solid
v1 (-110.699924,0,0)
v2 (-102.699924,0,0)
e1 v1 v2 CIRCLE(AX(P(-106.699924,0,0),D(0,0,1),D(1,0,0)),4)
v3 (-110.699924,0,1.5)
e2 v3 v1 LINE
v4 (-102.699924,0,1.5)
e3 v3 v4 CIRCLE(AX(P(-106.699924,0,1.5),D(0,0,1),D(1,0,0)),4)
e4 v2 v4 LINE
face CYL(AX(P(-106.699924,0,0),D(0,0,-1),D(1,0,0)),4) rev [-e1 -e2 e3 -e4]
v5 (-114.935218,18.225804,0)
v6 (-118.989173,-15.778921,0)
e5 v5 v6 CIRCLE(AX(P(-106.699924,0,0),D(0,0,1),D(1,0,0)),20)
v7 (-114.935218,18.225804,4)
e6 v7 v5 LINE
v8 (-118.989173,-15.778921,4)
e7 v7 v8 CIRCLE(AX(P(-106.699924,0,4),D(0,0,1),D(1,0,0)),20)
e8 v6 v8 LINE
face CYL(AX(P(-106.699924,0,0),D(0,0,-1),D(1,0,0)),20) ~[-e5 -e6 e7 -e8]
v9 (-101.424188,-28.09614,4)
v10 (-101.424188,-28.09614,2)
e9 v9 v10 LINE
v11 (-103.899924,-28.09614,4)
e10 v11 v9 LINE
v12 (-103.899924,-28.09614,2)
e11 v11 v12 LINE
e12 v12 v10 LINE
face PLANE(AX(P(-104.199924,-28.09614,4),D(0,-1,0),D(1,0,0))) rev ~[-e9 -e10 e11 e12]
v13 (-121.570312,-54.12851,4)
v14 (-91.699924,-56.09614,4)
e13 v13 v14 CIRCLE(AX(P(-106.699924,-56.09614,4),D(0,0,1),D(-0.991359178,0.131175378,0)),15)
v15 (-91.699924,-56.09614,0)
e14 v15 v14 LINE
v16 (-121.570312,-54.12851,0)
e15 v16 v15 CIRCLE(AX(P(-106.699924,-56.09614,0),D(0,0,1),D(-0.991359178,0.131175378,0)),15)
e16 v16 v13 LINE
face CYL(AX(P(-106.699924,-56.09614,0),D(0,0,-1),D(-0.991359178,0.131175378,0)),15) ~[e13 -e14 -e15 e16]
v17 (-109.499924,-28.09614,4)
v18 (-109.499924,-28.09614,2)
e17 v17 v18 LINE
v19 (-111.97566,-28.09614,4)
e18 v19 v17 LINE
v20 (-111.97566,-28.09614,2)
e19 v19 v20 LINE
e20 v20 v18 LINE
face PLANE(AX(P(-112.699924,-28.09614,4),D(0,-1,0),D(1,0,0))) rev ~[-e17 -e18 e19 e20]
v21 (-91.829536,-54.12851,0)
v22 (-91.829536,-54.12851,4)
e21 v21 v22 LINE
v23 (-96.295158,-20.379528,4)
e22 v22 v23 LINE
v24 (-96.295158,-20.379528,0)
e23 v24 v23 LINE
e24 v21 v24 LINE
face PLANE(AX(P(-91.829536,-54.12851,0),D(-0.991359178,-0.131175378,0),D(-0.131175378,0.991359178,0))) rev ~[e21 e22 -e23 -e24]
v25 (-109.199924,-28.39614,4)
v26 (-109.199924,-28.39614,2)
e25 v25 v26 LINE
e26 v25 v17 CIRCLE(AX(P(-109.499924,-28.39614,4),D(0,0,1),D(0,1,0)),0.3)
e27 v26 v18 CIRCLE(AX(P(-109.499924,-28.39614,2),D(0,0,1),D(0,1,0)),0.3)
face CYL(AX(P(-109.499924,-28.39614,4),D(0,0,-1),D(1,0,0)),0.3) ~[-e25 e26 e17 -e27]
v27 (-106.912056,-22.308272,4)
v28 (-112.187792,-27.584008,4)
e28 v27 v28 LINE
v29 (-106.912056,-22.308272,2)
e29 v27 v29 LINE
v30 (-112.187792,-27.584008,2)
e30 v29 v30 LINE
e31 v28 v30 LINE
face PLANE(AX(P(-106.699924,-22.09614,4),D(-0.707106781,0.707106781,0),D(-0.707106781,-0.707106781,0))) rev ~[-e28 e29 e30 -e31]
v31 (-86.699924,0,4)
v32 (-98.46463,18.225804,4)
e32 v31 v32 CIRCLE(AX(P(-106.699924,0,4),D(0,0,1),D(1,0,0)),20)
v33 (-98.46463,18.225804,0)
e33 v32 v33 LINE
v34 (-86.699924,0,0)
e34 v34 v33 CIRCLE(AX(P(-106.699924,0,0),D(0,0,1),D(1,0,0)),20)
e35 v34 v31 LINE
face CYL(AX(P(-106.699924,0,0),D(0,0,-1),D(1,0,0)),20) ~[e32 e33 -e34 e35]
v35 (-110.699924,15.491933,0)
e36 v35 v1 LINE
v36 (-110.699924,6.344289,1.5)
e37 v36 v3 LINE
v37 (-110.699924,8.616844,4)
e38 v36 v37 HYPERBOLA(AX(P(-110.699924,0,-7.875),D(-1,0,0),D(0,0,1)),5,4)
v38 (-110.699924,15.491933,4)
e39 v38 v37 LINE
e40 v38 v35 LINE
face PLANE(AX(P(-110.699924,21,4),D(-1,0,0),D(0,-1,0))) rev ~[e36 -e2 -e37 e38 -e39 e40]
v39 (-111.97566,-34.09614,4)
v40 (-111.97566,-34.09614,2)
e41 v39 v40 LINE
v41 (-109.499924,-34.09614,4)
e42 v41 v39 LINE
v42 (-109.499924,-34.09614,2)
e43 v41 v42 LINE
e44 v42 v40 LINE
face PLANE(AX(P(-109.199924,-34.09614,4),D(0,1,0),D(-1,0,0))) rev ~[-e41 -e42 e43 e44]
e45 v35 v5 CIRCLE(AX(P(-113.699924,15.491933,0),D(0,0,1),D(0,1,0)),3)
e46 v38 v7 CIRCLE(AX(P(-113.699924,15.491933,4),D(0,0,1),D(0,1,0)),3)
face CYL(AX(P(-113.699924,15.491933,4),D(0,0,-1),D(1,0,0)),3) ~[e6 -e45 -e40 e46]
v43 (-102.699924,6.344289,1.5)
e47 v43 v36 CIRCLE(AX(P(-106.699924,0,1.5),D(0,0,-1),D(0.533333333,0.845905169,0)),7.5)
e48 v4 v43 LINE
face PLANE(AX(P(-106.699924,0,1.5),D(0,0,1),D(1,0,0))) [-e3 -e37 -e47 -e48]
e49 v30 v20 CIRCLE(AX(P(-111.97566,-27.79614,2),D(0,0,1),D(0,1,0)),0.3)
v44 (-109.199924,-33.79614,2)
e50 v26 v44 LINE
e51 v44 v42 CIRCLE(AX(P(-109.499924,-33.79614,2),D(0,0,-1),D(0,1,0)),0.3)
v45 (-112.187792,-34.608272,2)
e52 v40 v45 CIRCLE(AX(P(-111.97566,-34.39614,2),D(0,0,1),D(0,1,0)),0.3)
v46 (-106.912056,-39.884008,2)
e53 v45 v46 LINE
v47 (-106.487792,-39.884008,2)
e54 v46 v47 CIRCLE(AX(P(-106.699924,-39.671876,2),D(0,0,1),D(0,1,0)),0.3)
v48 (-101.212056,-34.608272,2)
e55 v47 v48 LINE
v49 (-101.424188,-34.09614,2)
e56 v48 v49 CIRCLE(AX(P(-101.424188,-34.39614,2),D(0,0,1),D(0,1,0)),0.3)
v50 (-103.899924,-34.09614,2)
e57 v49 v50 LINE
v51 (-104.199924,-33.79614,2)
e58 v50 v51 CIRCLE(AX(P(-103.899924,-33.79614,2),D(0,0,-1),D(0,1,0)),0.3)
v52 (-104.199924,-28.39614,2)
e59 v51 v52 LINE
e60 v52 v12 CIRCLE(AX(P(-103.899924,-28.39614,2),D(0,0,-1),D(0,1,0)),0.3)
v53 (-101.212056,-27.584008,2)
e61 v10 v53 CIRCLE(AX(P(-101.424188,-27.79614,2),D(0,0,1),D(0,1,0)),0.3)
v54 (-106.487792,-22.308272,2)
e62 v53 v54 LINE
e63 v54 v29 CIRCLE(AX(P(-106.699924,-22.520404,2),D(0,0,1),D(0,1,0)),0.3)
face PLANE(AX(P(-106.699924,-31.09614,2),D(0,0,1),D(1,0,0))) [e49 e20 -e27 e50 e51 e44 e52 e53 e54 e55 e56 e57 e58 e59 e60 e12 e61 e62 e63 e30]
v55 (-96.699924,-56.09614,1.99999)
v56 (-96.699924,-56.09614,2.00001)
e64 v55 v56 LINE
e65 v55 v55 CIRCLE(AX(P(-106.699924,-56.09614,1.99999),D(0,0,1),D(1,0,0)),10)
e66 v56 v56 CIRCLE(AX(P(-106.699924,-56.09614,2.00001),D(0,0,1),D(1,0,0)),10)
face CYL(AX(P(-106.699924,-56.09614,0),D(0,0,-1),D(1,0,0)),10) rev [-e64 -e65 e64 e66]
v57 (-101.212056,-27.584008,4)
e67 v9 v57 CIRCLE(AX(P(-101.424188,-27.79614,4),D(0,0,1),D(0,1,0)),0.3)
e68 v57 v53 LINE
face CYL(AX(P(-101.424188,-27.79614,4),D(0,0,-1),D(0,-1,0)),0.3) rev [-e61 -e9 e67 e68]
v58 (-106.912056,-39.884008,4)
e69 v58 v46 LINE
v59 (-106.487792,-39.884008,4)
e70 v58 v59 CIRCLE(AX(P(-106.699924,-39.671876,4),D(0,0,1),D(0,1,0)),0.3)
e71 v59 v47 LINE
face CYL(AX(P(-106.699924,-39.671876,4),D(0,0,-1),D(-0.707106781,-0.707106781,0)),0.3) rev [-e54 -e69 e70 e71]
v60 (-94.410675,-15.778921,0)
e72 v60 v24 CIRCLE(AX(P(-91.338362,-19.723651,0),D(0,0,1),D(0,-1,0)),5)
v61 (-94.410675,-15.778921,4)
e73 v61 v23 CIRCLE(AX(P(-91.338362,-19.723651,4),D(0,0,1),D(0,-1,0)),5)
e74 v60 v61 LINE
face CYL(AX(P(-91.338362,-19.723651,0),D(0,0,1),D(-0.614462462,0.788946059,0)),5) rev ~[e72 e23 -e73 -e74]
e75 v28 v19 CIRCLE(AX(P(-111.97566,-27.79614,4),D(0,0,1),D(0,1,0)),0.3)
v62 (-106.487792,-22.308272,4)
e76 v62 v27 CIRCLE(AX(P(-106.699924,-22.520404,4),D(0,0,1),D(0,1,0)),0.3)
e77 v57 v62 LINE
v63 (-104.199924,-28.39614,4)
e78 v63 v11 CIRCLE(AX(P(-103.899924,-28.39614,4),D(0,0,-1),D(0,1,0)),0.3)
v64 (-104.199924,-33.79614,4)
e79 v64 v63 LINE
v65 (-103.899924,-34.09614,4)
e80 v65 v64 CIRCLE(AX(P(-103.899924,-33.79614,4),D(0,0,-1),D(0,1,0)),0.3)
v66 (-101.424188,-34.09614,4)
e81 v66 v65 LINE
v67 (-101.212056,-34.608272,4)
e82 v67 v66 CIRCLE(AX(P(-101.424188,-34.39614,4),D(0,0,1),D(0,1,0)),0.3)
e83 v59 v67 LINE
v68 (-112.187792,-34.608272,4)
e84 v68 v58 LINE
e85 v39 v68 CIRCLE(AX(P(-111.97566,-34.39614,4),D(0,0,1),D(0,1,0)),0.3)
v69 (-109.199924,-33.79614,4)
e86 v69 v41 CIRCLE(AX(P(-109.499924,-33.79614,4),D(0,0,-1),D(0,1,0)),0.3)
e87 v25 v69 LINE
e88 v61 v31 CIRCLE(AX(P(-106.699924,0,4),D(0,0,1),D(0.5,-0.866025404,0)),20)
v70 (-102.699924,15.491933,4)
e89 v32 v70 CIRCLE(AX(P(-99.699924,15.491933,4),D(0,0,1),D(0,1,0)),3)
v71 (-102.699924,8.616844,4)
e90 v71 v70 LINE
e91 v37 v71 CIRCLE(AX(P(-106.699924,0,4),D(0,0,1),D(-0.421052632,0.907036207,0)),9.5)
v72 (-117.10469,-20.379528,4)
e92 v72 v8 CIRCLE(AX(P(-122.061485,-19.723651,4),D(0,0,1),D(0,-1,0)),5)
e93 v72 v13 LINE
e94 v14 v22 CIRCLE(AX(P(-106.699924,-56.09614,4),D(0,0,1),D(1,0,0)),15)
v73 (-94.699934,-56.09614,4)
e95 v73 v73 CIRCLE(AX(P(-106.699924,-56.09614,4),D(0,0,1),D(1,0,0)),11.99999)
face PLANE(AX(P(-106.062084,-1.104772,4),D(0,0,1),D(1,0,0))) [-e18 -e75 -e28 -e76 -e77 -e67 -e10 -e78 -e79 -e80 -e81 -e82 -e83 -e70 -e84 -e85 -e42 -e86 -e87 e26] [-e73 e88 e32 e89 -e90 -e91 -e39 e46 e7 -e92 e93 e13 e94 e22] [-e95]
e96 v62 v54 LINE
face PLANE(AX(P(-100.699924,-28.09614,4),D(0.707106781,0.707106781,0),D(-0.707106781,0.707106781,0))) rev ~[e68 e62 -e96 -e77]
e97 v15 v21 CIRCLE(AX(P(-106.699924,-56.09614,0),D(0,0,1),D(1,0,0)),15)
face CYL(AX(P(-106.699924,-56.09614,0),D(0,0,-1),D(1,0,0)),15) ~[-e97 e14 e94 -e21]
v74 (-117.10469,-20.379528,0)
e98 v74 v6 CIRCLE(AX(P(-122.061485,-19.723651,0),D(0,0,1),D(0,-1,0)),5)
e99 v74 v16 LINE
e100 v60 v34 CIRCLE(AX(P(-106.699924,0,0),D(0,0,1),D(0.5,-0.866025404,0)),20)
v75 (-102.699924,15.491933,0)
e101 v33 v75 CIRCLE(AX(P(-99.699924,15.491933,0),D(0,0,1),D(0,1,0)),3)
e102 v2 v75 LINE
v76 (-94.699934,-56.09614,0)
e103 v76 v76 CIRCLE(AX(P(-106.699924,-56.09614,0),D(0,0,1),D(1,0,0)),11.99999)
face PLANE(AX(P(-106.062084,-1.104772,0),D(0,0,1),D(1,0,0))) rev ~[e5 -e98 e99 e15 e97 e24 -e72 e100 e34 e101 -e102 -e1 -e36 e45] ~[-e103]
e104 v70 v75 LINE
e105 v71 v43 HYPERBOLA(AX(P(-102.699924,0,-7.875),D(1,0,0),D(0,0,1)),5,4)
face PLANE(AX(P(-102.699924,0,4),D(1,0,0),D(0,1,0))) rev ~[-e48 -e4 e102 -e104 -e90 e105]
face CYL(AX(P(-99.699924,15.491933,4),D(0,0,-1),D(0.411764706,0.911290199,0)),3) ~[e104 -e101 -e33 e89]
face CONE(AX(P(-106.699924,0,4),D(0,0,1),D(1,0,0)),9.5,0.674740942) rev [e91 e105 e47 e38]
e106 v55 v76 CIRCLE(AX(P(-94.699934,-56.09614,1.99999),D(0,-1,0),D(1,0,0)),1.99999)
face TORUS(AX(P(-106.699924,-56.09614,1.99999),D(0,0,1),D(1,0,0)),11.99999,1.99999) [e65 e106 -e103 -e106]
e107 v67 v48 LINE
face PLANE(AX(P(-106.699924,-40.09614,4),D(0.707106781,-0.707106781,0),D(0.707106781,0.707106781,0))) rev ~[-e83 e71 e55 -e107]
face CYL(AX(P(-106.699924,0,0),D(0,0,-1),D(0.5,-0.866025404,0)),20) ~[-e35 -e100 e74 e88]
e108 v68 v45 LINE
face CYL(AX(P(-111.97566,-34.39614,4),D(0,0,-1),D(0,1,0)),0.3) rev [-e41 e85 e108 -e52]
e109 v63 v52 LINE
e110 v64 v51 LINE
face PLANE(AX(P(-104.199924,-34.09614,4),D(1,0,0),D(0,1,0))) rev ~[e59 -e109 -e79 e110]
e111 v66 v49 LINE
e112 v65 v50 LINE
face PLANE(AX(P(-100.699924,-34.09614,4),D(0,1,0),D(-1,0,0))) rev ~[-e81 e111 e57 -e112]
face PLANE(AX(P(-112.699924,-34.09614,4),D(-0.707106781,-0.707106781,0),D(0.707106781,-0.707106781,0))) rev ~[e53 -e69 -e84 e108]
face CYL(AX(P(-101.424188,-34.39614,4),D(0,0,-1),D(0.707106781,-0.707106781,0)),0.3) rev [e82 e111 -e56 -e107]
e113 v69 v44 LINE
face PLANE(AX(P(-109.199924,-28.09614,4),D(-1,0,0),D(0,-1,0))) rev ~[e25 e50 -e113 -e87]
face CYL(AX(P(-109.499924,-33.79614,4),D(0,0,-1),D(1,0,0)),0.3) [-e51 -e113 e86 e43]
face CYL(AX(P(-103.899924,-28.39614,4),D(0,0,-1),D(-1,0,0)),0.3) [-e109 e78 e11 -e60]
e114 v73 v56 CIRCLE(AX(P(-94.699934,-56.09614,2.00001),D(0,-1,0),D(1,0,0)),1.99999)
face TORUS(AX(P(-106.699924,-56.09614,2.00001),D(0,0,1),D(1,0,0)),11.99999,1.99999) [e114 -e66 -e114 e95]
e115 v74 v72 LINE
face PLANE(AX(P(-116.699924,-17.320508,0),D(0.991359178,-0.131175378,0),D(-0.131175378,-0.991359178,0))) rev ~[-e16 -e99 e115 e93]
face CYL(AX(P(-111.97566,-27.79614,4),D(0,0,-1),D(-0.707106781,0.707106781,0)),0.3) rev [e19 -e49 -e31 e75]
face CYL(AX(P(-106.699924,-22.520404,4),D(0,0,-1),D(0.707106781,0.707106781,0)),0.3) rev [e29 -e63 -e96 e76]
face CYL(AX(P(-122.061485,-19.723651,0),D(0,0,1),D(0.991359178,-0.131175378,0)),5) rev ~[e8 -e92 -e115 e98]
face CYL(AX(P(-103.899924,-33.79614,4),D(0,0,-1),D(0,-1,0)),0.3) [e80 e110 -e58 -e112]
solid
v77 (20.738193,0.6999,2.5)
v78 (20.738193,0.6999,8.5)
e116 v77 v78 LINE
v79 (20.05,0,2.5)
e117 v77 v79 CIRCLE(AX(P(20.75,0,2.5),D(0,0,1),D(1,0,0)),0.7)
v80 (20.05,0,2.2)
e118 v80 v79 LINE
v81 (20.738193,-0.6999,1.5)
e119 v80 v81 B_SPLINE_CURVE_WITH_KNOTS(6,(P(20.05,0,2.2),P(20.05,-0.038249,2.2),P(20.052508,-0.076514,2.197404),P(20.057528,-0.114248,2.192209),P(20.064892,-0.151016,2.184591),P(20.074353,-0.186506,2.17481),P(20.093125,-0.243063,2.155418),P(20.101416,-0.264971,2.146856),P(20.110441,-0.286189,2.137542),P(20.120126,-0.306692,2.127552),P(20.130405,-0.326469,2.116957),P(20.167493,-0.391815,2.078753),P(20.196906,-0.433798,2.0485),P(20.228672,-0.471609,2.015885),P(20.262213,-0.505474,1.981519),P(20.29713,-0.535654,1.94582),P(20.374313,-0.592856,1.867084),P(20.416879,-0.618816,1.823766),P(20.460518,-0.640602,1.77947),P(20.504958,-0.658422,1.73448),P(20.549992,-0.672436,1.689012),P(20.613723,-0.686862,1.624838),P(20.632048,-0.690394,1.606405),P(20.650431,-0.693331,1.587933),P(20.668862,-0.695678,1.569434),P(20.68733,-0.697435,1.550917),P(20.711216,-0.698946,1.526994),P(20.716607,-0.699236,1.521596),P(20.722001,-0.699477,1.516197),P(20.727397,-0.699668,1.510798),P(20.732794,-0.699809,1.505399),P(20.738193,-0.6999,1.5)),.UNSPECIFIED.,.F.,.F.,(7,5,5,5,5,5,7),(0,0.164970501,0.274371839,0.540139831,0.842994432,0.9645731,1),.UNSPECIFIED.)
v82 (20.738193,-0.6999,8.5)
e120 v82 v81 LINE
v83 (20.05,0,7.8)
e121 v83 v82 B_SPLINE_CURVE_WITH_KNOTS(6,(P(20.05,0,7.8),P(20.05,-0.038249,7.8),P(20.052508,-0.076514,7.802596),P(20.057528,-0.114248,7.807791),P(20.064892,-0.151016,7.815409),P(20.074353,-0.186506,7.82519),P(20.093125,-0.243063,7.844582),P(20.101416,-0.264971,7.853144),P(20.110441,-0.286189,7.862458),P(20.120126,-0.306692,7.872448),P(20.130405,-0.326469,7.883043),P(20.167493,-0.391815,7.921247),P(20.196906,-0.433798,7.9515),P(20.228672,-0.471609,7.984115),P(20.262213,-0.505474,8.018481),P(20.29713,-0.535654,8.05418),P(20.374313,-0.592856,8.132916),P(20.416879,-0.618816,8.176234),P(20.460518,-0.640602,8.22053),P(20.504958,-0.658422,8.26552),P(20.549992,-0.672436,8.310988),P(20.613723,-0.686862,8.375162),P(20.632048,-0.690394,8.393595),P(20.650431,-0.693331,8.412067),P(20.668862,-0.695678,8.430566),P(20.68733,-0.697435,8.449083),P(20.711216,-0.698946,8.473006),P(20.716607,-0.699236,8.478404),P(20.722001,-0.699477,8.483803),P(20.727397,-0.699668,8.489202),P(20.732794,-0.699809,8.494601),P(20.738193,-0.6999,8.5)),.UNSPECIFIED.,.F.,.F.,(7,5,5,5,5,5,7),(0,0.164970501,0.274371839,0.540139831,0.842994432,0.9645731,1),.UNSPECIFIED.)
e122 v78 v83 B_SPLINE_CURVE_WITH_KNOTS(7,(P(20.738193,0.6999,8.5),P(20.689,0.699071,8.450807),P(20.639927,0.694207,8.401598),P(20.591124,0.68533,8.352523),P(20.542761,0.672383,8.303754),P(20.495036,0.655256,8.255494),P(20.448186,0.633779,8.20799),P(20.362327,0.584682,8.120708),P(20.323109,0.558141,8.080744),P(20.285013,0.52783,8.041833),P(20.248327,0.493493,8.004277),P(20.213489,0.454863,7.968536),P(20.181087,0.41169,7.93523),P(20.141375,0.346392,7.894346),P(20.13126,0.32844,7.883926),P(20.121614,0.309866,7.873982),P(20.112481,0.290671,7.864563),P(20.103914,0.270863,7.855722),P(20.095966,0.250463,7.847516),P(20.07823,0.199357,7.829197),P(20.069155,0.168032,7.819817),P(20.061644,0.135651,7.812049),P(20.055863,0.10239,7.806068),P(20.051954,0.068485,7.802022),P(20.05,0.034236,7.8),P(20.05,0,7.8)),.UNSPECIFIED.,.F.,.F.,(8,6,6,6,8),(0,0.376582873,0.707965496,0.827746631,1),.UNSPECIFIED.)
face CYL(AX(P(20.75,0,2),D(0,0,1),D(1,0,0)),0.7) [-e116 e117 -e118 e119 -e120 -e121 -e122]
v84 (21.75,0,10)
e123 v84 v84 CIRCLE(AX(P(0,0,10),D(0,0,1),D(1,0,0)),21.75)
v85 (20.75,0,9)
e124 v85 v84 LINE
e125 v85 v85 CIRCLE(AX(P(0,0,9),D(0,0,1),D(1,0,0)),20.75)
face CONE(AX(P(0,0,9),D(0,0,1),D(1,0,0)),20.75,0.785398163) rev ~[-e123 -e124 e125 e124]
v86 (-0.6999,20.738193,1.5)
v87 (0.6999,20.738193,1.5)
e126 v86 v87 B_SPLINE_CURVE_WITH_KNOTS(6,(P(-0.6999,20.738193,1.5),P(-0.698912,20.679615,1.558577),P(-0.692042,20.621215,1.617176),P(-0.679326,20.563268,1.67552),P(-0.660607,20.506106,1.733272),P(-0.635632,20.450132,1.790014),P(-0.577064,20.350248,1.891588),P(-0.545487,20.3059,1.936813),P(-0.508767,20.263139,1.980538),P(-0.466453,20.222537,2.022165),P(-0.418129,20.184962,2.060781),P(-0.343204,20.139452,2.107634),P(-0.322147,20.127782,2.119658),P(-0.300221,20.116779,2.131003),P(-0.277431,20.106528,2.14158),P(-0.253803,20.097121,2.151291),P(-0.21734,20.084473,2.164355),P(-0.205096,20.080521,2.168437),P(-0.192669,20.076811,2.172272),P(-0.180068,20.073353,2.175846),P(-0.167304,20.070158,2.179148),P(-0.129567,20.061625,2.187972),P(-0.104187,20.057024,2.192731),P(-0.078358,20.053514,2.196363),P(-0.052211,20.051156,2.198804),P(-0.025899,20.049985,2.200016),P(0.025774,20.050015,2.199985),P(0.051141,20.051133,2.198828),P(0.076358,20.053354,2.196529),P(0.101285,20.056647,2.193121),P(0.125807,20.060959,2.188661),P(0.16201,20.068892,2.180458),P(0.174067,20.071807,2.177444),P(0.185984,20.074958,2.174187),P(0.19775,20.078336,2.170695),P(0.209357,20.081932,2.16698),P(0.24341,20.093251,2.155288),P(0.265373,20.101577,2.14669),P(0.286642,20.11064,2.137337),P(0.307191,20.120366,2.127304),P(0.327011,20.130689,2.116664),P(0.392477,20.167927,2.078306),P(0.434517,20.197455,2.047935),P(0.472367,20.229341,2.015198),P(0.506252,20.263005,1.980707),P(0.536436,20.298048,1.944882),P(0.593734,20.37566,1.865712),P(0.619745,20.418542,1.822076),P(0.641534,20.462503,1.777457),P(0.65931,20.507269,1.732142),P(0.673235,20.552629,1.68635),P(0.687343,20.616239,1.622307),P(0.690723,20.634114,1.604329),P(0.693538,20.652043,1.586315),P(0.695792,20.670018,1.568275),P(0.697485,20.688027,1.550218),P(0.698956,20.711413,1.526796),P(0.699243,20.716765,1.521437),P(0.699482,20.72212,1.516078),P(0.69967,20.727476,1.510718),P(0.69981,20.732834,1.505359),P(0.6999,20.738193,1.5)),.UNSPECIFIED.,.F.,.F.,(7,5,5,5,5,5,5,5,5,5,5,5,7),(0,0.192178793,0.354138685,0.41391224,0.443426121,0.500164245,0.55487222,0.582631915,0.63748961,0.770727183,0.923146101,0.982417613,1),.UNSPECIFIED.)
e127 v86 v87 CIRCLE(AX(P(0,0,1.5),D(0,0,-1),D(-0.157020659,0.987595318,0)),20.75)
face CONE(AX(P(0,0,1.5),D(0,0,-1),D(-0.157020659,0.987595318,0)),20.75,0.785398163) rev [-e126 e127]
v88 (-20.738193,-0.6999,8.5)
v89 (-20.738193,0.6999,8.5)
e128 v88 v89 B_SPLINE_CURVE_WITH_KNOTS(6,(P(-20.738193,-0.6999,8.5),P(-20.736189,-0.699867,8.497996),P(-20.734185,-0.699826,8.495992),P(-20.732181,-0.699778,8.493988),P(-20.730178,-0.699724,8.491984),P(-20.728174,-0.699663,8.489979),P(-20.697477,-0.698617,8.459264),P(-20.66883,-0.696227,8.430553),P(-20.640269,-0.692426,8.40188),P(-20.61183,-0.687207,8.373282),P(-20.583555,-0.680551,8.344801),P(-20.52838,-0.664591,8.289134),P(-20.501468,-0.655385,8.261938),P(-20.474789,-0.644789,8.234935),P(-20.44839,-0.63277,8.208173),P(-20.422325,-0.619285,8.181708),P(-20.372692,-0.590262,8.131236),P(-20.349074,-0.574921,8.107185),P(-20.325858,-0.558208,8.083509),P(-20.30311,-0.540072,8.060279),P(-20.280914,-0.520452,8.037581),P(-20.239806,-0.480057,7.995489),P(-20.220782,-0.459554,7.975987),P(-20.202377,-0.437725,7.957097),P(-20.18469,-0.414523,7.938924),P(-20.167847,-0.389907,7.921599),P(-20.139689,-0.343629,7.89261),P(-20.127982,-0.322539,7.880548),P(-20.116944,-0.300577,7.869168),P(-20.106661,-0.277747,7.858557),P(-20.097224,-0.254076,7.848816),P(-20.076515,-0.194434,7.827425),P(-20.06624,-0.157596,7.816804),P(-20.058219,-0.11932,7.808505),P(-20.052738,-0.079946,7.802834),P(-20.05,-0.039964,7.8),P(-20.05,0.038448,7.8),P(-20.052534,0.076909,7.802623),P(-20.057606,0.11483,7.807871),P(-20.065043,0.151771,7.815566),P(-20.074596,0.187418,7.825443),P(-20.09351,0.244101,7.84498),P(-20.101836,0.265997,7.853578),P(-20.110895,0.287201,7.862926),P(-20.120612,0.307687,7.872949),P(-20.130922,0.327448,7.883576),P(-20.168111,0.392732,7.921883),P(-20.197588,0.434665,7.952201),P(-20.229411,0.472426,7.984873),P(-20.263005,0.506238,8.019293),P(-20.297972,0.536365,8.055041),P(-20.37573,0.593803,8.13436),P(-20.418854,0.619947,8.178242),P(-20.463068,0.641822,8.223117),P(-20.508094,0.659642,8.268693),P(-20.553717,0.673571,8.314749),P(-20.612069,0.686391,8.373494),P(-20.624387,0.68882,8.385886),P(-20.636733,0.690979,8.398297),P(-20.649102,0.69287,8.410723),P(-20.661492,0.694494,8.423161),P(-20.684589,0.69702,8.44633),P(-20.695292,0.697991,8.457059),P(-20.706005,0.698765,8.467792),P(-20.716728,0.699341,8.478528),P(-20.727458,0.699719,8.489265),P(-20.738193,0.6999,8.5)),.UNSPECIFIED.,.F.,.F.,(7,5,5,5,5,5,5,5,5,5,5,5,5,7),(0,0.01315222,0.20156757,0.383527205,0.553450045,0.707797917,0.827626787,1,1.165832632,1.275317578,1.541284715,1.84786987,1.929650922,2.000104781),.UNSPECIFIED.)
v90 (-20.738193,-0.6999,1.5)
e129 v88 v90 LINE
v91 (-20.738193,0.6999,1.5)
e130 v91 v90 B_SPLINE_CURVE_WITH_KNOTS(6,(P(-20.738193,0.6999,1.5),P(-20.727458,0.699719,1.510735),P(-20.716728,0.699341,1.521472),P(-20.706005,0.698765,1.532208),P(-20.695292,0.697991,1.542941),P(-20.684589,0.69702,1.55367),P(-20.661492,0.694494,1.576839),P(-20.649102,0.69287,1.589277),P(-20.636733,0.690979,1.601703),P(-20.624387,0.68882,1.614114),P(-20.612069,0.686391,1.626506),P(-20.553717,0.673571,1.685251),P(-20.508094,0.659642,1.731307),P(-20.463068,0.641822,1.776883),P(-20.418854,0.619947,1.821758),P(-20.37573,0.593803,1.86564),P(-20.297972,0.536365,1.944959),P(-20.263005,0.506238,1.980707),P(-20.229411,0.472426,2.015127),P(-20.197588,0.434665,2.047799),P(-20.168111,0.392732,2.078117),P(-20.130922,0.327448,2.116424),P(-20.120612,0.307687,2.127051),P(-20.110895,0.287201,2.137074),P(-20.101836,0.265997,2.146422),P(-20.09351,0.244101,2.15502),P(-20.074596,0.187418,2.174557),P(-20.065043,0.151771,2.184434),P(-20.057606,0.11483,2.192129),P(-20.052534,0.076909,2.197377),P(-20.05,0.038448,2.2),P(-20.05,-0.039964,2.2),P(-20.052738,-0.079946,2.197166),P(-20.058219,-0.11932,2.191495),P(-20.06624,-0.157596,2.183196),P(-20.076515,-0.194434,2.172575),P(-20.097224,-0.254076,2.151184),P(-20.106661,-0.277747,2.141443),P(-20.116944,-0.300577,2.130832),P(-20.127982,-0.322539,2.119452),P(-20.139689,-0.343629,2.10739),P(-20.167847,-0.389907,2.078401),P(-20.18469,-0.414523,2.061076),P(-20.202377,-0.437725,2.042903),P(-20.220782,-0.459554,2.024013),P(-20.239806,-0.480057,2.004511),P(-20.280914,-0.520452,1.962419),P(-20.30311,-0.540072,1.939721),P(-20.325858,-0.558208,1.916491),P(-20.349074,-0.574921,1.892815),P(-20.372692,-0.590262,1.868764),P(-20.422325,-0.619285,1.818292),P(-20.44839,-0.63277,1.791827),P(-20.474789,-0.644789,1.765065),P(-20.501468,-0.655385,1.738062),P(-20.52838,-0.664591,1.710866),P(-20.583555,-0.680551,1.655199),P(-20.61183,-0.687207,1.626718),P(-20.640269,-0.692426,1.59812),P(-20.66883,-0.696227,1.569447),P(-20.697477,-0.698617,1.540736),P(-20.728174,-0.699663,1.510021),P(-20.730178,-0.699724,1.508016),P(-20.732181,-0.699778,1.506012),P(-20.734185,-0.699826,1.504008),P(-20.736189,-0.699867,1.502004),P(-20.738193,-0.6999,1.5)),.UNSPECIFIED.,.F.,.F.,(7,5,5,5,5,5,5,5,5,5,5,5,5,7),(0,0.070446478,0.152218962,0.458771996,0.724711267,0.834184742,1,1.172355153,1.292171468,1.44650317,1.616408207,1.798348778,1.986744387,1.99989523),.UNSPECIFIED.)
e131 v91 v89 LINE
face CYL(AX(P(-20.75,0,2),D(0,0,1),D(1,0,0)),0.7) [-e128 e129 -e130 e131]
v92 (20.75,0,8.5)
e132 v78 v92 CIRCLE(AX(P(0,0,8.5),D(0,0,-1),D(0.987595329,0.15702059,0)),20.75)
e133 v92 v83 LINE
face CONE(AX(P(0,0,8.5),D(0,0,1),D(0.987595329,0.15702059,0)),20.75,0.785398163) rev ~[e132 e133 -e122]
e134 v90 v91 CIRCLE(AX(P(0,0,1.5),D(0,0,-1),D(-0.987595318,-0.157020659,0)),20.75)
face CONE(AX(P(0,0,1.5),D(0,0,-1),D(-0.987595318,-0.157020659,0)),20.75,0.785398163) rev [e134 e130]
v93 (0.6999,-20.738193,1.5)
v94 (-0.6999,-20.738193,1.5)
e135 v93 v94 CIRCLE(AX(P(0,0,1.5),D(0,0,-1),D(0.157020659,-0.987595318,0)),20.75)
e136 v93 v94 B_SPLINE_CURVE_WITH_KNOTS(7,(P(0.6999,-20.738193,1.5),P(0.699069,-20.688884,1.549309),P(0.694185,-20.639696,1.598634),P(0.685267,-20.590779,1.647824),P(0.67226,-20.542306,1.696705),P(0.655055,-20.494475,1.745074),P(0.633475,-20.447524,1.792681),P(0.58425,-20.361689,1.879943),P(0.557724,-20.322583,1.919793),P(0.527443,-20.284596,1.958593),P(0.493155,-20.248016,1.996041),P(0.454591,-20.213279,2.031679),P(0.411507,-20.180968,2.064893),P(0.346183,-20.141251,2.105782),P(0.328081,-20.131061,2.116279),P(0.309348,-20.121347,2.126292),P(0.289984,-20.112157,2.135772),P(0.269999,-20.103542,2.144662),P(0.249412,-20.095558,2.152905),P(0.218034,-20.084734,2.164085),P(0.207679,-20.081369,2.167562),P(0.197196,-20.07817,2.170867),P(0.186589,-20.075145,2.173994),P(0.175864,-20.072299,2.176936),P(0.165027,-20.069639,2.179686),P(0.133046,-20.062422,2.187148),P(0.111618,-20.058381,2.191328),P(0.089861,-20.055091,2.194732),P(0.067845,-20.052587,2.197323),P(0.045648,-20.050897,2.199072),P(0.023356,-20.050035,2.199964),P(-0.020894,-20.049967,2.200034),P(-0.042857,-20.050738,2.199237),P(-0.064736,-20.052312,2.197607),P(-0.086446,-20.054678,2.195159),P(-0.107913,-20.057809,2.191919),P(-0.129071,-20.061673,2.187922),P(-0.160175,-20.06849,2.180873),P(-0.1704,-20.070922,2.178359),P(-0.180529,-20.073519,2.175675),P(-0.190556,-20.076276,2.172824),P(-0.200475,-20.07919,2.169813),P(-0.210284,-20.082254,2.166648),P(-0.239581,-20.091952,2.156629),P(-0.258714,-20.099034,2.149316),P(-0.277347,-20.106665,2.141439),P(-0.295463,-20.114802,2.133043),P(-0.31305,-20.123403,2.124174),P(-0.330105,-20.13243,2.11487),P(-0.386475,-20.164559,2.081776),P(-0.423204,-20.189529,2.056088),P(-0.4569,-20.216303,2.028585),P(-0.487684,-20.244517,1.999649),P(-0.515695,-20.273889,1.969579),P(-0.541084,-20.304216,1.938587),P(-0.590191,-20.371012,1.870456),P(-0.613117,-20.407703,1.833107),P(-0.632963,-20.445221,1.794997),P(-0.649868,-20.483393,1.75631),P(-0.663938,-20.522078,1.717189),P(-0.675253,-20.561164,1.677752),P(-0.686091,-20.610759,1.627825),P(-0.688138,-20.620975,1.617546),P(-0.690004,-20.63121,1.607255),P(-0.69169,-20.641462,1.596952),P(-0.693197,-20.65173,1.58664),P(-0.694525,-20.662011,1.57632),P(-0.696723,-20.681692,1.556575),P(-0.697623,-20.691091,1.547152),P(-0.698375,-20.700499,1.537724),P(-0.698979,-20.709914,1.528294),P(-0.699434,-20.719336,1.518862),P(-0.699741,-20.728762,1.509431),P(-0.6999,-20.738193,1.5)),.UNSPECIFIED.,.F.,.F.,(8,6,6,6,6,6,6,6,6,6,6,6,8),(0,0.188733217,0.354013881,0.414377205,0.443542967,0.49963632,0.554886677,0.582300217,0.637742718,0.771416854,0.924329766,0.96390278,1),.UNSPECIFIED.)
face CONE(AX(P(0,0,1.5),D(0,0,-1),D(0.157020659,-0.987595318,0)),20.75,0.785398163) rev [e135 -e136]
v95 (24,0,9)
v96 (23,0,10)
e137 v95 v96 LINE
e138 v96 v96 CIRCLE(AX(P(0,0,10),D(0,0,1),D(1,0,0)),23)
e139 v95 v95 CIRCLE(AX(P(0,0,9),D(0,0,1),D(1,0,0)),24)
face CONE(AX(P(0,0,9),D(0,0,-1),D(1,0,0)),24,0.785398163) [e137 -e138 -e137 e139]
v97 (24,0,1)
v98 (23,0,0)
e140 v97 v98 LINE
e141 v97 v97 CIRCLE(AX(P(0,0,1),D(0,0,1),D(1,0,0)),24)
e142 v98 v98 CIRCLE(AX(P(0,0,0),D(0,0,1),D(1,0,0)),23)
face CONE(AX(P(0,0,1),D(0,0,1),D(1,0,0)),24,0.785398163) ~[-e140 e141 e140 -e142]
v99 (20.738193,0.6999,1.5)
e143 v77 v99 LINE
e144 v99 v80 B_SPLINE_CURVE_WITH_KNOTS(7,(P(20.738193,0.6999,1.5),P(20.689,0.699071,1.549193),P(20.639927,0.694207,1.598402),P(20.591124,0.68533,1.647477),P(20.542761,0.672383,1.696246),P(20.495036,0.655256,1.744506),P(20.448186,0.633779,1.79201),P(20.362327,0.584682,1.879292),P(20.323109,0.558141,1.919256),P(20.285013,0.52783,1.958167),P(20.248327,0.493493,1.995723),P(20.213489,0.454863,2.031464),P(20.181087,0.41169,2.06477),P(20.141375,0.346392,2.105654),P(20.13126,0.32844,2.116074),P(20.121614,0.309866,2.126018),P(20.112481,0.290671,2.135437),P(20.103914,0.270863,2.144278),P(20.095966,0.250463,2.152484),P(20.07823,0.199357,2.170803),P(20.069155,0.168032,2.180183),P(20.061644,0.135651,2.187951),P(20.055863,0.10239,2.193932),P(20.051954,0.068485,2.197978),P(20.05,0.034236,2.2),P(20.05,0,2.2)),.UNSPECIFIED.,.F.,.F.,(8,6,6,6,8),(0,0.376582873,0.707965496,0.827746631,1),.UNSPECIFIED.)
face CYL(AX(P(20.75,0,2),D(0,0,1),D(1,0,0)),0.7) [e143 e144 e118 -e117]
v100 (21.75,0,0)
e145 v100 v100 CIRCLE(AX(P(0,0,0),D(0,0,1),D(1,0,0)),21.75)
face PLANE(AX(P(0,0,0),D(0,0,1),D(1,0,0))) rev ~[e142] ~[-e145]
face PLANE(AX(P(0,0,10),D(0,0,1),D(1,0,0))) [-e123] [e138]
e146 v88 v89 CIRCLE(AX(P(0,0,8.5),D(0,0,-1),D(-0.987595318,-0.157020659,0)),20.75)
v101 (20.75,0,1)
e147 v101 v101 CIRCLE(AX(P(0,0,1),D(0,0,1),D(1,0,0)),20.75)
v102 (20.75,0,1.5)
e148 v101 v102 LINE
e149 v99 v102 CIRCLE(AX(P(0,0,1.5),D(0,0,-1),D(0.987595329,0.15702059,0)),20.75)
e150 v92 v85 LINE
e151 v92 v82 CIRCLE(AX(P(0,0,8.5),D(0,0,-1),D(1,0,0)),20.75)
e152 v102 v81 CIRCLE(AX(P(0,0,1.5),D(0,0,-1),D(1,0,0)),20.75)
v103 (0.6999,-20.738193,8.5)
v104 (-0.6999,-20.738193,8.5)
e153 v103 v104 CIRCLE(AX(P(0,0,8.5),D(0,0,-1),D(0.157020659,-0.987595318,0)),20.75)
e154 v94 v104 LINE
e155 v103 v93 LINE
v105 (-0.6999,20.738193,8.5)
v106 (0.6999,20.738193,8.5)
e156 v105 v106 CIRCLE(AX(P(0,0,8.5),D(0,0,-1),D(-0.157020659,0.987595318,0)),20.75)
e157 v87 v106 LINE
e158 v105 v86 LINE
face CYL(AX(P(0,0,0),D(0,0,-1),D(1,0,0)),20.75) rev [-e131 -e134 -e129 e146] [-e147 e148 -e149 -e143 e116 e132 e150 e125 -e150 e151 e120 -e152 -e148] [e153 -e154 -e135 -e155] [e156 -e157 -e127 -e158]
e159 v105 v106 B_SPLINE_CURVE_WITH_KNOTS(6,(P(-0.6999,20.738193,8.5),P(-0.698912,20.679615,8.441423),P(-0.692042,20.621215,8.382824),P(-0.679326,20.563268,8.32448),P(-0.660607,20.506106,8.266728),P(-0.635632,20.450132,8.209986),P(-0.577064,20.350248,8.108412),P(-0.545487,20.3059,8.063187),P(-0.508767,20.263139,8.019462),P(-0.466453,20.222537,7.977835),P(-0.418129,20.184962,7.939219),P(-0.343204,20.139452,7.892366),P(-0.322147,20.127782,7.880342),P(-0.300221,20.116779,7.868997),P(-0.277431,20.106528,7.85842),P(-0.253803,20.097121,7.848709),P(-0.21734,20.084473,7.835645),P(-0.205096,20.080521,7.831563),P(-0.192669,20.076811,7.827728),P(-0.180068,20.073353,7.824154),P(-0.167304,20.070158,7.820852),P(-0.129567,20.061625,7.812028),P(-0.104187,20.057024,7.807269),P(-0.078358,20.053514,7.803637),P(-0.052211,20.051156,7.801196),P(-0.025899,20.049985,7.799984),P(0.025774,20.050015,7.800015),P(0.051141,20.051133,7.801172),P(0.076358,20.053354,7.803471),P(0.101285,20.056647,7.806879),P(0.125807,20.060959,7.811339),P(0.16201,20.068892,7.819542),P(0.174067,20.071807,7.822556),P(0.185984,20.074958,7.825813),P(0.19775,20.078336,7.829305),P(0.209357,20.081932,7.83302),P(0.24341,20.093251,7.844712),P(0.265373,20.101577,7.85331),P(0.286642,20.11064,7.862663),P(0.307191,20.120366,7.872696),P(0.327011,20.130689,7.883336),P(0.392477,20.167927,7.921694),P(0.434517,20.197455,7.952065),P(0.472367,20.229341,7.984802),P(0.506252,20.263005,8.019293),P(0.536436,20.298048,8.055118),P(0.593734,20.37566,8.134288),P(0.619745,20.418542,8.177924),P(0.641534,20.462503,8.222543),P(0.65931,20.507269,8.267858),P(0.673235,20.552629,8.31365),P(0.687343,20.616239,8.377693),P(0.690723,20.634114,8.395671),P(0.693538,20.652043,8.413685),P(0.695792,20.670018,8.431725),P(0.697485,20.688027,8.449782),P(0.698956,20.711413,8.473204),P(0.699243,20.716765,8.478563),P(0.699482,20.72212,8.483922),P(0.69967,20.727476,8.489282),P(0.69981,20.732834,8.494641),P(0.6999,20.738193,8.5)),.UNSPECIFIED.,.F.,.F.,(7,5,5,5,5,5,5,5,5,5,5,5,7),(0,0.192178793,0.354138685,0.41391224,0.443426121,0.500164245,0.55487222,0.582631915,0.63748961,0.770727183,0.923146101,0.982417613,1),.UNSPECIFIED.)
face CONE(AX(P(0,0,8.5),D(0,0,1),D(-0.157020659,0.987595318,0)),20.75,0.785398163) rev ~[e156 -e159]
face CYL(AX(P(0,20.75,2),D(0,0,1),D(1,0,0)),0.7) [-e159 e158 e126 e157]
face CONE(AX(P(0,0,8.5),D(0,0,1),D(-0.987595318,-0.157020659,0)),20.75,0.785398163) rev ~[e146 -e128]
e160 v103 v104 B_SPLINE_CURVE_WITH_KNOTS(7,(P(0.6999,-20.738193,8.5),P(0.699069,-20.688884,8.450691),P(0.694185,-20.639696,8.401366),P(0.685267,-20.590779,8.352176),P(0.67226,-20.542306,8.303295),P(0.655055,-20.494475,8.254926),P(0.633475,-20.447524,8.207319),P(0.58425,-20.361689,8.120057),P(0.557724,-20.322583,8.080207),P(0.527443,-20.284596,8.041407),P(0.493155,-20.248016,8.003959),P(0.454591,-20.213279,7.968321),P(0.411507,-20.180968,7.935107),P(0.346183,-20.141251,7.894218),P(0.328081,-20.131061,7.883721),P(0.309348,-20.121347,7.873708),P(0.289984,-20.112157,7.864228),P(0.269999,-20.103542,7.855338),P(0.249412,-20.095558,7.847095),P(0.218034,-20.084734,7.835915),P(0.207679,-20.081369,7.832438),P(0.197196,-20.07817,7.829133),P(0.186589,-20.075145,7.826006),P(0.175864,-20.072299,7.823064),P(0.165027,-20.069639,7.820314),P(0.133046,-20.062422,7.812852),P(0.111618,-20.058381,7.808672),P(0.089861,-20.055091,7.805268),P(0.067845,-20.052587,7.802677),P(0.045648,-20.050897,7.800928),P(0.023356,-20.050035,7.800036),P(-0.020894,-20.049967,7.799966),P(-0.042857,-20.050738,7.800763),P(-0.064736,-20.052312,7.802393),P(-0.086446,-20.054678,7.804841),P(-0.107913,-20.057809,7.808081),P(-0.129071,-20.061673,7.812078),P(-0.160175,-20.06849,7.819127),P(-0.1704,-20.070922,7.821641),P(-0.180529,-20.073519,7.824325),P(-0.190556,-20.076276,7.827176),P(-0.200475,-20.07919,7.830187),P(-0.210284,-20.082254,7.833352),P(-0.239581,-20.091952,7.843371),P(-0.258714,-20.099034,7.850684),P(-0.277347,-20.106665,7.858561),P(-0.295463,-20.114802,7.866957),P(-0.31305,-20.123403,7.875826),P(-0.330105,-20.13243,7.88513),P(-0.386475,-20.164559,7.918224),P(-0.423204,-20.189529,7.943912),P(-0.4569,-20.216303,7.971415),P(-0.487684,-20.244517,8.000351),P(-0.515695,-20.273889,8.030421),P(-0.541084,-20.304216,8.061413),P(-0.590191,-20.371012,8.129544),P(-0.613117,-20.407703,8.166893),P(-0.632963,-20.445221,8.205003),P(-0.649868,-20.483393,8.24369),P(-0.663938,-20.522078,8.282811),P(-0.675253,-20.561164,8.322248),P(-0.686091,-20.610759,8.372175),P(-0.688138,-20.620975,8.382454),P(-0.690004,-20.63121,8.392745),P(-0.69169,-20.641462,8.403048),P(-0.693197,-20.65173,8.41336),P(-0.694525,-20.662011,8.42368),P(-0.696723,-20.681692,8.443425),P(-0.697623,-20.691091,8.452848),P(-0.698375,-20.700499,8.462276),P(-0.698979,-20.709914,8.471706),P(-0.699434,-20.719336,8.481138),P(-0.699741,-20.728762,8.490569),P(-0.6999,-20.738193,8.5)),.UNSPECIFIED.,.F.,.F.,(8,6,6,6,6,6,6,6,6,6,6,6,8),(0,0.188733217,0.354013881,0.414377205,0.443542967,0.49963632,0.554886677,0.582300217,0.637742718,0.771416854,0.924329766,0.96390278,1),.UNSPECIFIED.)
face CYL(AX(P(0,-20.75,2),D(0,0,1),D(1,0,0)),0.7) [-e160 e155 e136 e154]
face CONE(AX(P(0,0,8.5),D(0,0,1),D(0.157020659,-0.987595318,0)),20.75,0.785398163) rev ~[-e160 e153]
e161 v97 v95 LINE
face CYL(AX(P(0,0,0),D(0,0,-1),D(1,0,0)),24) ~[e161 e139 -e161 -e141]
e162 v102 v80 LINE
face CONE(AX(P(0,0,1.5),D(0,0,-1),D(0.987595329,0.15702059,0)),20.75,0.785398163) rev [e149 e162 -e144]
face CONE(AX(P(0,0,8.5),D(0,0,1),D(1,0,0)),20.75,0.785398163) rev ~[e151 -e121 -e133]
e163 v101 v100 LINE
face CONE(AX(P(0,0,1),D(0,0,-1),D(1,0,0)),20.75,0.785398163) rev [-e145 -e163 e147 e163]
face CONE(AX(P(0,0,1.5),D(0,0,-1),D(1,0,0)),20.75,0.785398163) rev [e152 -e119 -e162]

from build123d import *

# Parameters (mm, degrees)
F1_R         = 24
F1_R_2       = 20.75
F2_DEPTH     = 10
F3_SIZE      = 1
F5_R         = 0.7
F6_DEPTH     = 2.5
F7_T4_ANGLE  = 18.0680133359
F7_S5_R      = 0.7
F7_T6_DEPTH  = 5
F7_T10_ANGLE = 18.0680133359
F7_S11_R     = 0.7
F7_T12_DEPTH = 5
F7_T16_ANGLE = 9.0340027216
F7_S17_R     = 0.7
F7_T18_DEPTH = 3
F7_T22_ANGLE = 9.0340027216
F7_S23_R     = 0.7
F7_T24_DEPTH = 3
F7_T28_ANGLE = 18.0680133359
F7_S29_R     = 0.7
F7_T30_DEPTH = 5
F7_T34_ANGLE = 18.0680133359
F7_S35_R     = 0.7
F7_T36_DEPTH = 5
F7_T40_ANGLE = 9.0340027216
F7_S41_R     = 0.7
F7_T42_DEPTH = 3
F7_T46_ANGLE = 9.0340027216
F7_S47_R     = 0.7
F7_T48_DEPTH = 3
F7_T52_ANGLE = 18.0680133359
F7_S53_R     = 0.7
F7_T54_DEPTH = 5
F7_T58_ANGLE = 18.0680133359
F7_S59_R     = 0.7
F7_T60_DEPTH = 5
F8_R         = 4
F8_R_2       = 10
F9_DEPTH     = 4
F10_R        = 9.5
F10_R_2      = 4
F11_DEPTH    = 2.5
F14_DEPTH    = 4.001
F15_R        = 3
F16_R        = 5
F17_R        = 1.99999
F19_DEPTH    = 2
F20_R        = 0.3


# Not quite as in the source:
# - a fillet or chamfer that OpenCascade refuses, or shapes differently, is made with other operations: its cross-section is extruded or revolved along the edge and cut away or added
# - a fillet or chamfer is up to 0.001 mm smaller than in the source, because OpenCascade refuses the exact size
# - a feature names something its author has since deleted; it is built from what else it names


with BuildPart() as f2:
    # F1 (on Top) → F2 (new body)
    with BuildSketch(Plane.XY):
        Circle(F1_R)
        Circle(F1_R_2, mode=Mode.SUBTRACT)
    extrude(amount=F2_DEPTH)

    # F3
    f3_edges = [f2.edges().sort_by_distance(p)[0] for p in [
        (-20.75, 0, 10),
        (-20.75, 0, 0),
        (-24, 0, 10),
        (-24, 0, 0),
    ]]
    chamfer(f3_edges, length=F3_SIZE)

    # F5 (on offset) → F6 (join, symmetric)
    with BuildSketch(Plane.XY.offset(5)):
        with Locations((-20.75, 0)):
            Circle(F5_R)
        with Locations((0, -20.75)):
            Circle(F5_R)
        with Locations((20.75, 0)):
            Circle(F5_R)
        with Locations((0, 20.75)):
            Circle(F5_R)
    extrude(amount=F6_DEPTH, both=True)

    # F7: chamfer of 1 on 10 edges, made by hand


with BuildPart() as f7_tool2:
    # F7_s3 → F7_t4 (revolve)
    with BuildSketch(Plane(origin=(0, 0, 0), x_dir=(0, 0, 1), z_dir=(-0.9875953183, -0.1570206585, 0))):
        Polygon((8.5, 20.75), (7.5, 19.75), (7.5, 20.75), align=None)
    revolve(axis=Axis((0, 0, 7.5), (0, 0, -1)), revolution_arc=F7_T4_ANGLE)

    # F7_s5 → F7_t6 (intersect, symmetric)
    with BuildSketch(Plane.XY.offset(8)):
        with Locations((0, 20.75)):
            Circle(F7_S5_R)
    extrude(amount=F7_T6_DEPTH, both=True, mode=Mode.INTERSECT)


with BuildPart() as f2_1:
    add(f2.part)

    # F7_t1: union F7_tool2
    add(f7_tool2.part)


with BuildPart() as f7_tool8:
    # F7_s9 → F7_t10 (revolve)
    with BuildSketch(Plane(origin=(0, 0, 0), x_dir=(0, 0, 1), z_dir=(0.1570206585, -0.9875953183, 0))):
        Polygon((8.5, 20.75), (7.5, 19.75), (7.5, 20.75), align=None)
    revolve(axis=Axis((0, 0, 7.5), (0, 0, -1)), revolution_arc=F7_T10_ANGLE)

    # F7_s11 → F7_t12 (intersect, symmetric)
    with BuildSketch(Plane.XY.offset(8)):
        with Locations((-20.75, 0)):
            Circle(F7_S11_R)
    extrude(amount=F7_T12_DEPTH, both=True, mode=Mode.INTERSECT)


with BuildPart() as f2_2:
    add(f2_1.part)

    # F7_t7: union F7_tool8
    add(f7_tool8.part)


with BuildPart() as f7_tool14:
    # F7_s15 → F7_t16 (revolve)
    with BuildSketch(Plane.XZ):
        Polygon((20.75, 8.5), (19.75, 7.5), (20.75, 7.5), align=None)
    revolve(axis=Axis((0, 0, 7.5), (0, 0, -1)), revolution_arc=F7_T16_ANGLE)

    # F7_s17 → F7_t18 (intersect, symmetric)
    with BuildSketch(Plane.XY.offset(8)):
        with Locations((20.75, 0)):
            Circle(F7_S17_R)
    extrude(amount=F7_T18_DEPTH, both=True, mode=Mode.INTERSECT)


with BuildPart() as f2_3:
    add(f2_2.part)

    # F7_t13: union F7_tool14
    add(f7_tool14.part)


with BuildPart() as f7_tool20:
    # F7_s21 → F7_t22 (revolve)
    with BuildSketch(Plane(origin=(0, 0, 0), x_dir=(0, 0, 1), z_dir=(-0.1570205904, 0.9875953292, 0))):
        Polygon((8.5, 20.75), (7.5, 19.75), (7.5, 20.75), align=None)
    revolve(axis=Axis((0, 0, 7.5), (0, 0, -1)), revolution_arc=F7_T22_ANGLE)

    # F7_s23 → F7_t24 (intersect, symmetric)
    with BuildSketch(Plane.XY.offset(8)):
        with Locations((20.75, 0)):
            Circle(F7_S23_R)
    extrude(amount=F7_T24_DEPTH, both=True, mode=Mode.INTERSECT)


with BuildPart() as f2_4:
    add(f2_3.part)

    # F7_t19: union F7_tool20
    add(f7_tool20.part)


with BuildPart() as f7_tool26:
    # F7_s27 → F7_t28 (revolve)
    with BuildSketch(Plane(origin=(0, 0, 0), x_dir=(0, 0, 1), z_dir=(0.9875953183, 0.1570206585, 0))):
        Polygon((8.5, 20.75), (7.5, 19.75), (7.5, 20.75), align=None)
    revolve(axis=Axis((0, 0, 7.5), (0, 0, -1)), revolution_arc=F7_T28_ANGLE)

    # F7_s29 → F7_t30 (intersect, symmetric)
    with BuildSketch(Plane.XY.offset(8)):
        with Locations((0, -20.75)):
            Circle(F7_S29_R)
    extrude(amount=F7_T30_DEPTH, both=True, mode=Mode.INTERSECT)


with BuildPart() as f2_5:
    add(f2_4.part)

    # F7_t25: union F7_tool26
    add(f7_tool26.part)


with BuildPart() as f7_tool32:
    # F7_s33 → F7_t34 (revolve)
    with BuildSketch(Plane(origin=(0, 0, 0), x_dir=(0, 0, 1), z_dir=(-0.9875953183, -0.1570206585, 0))):
        Polygon((1.5, 20.75), (2.5, 19.75), (2.5, 20.75), align=None)
    revolve(axis=Axis((0, 0, 2.5), (0, 0, -1)), revolution_arc=F7_T34_ANGLE)

    # F7_s35 → F7_t36 (intersect, symmetric)
    with BuildSketch(Plane.XY.offset(2)):
        with Locations((0, 20.75)):
            Circle(F7_S35_R)
    extrude(amount=F7_T36_DEPTH, both=True, mode=Mode.INTERSECT)


with BuildPart() as f2_6:
    add(f2_5.part)

    # F7_t31: union F7_tool32
    add(f7_tool32.part)


with BuildPart() as f7_tool38:
    # F7_s39 → F7_t40 (revolve)
    with BuildSketch(Plane.XZ):
        Polygon((20.75, 1.5), (19.75, 2.5), (20.75, 2.5), align=None)
    revolve(axis=Axis((0, 0, 2.5), (0, 0, -1)), revolution_arc=F7_T40_ANGLE)

    # F7_s41 → F7_t42 (intersect, symmetric)
    with BuildSketch(Plane.XY.offset(2)):
        with Locations((20.75, 0)):
            Circle(F7_S41_R)
    extrude(amount=F7_T42_DEPTH, both=True, mode=Mode.INTERSECT)


with BuildPart() as f2_7:
    add(f2_6.part)

    # F7_t37: union F7_tool38
    add(f7_tool38.part)


with BuildPart() as f7_tool44:
    # F7_s45 → F7_t46 (revolve)
    with BuildSketch(Plane(origin=(0, 0, 0), x_dir=(0, 0, 1), z_dir=(-0.1570205904, 0.9875953292, 0))):
        Polygon((1.5, 20.75), (2.5, 19.75), (2.5, 20.75), align=None)
    revolve(axis=Axis((0, 0, 2.5), (0, 0, -1)), revolution_arc=F7_T46_ANGLE)

    # F7_s47 → F7_t48 (intersect, symmetric)
    with BuildSketch(Plane.XY.offset(2)):
        with Locations((20.75, 0)):
            Circle(F7_S47_R)
    extrude(amount=F7_T48_DEPTH, both=True, mode=Mode.INTERSECT)


with BuildPart() as f2_8:
    add(f2_7.part)

    # F7_t43: union F7_tool44
    add(f7_tool44.part)


with BuildPart() as f7_tool50:
    # F7_s51 → F7_t52 (revolve)
    with BuildSketch(Plane(origin=(0, 0, 0), x_dir=(0, 0, 1), z_dir=(0.9875953183, 0.1570206585, 0))):
        Polygon((1.5, 20.75), (2.5, 19.75), (2.5, 20.75), align=None)
    revolve(axis=Axis((0, 0, 2.5), (0, 0, -1)), revolution_arc=F7_T52_ANGLE)

    # F7_s53 → F7_t54 (intersect, symmetric)
    with BuildSketch(Plane.XY.offset(2)):
        with Locations((0, -20.75)):
            Circle(F7_S53_R)
    extrude(amount=F7_T54_DEPTH, both=True, mode=Mode.INTERSECT)


with BuildPart() as f2_9:
    add(f2_8.part)

    # F7_t49: union F7_tool50
    add(f7_tool50.part)


with BuildPart() as f7_tool56:
    # F7_s57 → F7_t58 (revolve)
    with BuildSketch(Plane(origin=(0, 0, 0), x_dir=(0, 0, 1), z_dir=(0.1570206585, -0.9875953183, 0))):
        Polygon((1.5, 20.75), (2.5, 19.75), (2.5, 20.75), align=None)
    revolve(axis=Axis((0, 0, 2.5), (0, 0, -1)), revolution_arc=F7_T58_ANGLE)

    # F7_s59 → F7_t60 (intersect, symmetric)
    with BuildSketch(Plane.XY.offset(2)):
        with Locations((-20.75, 0)):
            Circle(F7_S59_R)
    extrude(amount=F7_T60_DEPTH, both=True, mode=Mode.INTERSECT)


with BuildPart() as f2_10:
    add(f2_9.part)

    # F7_t55: union F7_tool56
    add(f7_tool56.part)


with BuildPart() as f9:
    # F8 (on Top) → F9 (new body)
    with BuildSketch(Plane.XY):
        with BuildLine():
            ThreePointArc((-96.6999239548, -17.3205080757), (-89.3794158791, -10), (-86.6999239548, 0))
            ThreePointArc((-86.6999239548, 0), (-116.6999239548, 17.3205080757), (-116.6999239548, -17.3205080757))
            ThreePointArc((-116.6999239548, -17.3205080757), (-106.6999239548, -20), (-96.6999239548, -17.3205080757))
        make_face()
        with Locations((-106.6999239548, 0)):
            Circle(F8_R, mode=Mode.SUBTRACT)
        with BuildLine():
            ThreePointArc((-96.6999239548, -17.3205080757), (-106.6999239548, -20), (-116.6999239548, -17.3205080757))
            Line((-116.6999239548, -17.3205080757), (-121.5703116276, -54.1285096235))
            ThreePointArc((-121.5703116276, -54.1285096235), (-106.6999239548, -41.0961402953), (-91.829536282, -54.1285096235))
            Line((-91.829536282, -54.1285096235), (-96.6999239548, -17.3205080757))
        make_face()
        with BuildLine():
            ThreePointArc((-91.829536282, -54.1285096235), (-106.6999239548, -41.0961402953), (-121.5703116276, -54.1285096235))
            ThreePointArc((-121.5703116276, -54.1285096235), (-107.6858714453, -71.063702139), (-91.6999239548, -56.0961402953))
            ThreePointArc((-91.6999239548, -56.0961402953), (-91.7323621111, -55.1101928048), (-91.829536282, -54.1285096235))
        make_face()
        with Locations((-106.6999239548, -56.0961402953)):
            Circle(F8_R_2, mode=Mode.SUBTRACT)
    extrude(amount=F9_DEPTH)

    # F10 (on face) → F11 (cut)
    with BuildSketch(Plane.XY.offset(4)):
        with Locations((-106.6999239548, 0)):
            Circle(F10_R)
        with Locations((-106.6999239548, 0)):
            Circle(F10_R_2, mode=Mode.SUBTRACT)
    extrude(amount=-F11_DEPTH, mode=Mode.SUBTRACT)

    # F12: chamfer of 2 x 2.5 on 1 edges, made by hand


with BuildPart() as f12_tool2:
    # F12_s3 → F12_t4 (revolve)
    with BuildSketch(Plane.XZ):
        Polygon((-97.1999239548, 4), (-99.1999239548, 1.5), (-97.1999239548, 1.5), align=None)
    revolve(axis=Axis((-106.6999239548, 0, 1.5), (0, 0, 1)))

    split(bisect_by=Plane.XY.offset(4), keep=Keep.BOTTOM)


with BuildPart() as f9_1:
    add(f9.part)

    # F12_t1: union F12_tool2
    add(f12_tool2.part)

    # F13 (on face) → F14 (cut, through all)
    with BuildSketch(Plane.XY.offset(4)):
        with BuildLine():
            ThreePointArc((-110.6999239548, 19.5959179423), (-106.6999239548, 20), (-102.6999239548, 19.5959179423))
            Line((-102.6999239548, 19.5959179423), (-102.6999239548, 21))
            Line((-102.6999239548, 21), (-110.6999239548, 21))
            Line((-110.6999239548, 21), (-110.6999239548, 19.5959179423))
        make_face()
        with BuildLine():
            ThreePointArc((-110.6999239548, 8.6168439698), (-106.6999239548, 9.5), (-102.6999239548, 8.6168439698))
            Line((-102.6999239548, 8.6168439698), (-102.6999239548, 19.5959179423))
            ThreePointArc((-102.6999239548, 19.5959179423), (-106.6999239548, 20), (-110.6999239548, 19.5959179423))
            Line((-110.6999239548, 19.5959179423), (-110.6999239548, 8.6168439698))
        make_face()
        with BuildLine():
            ThreePointArc((-110.6999239548, 0), (-106.6999239548, 4), (-102.6999239548, 0))
            Line((-102.6999239548, 0), (-102.6999239548, 8.6168439698))
            ThreePointArc((-102.6999239548, 8.6168439698), (-106.6999239548, 9.5), (-110.6999239548, 8.6168439698))
            Line((-110.6999239548, 8.6168439698), (-110.6999239548, 0))
        make_face()
    extrude(amount=-F14_DEPTH, mode=Mode.SUBTRACT)

    # F15
    f15_edges = [f9_1.edges().sort_by_distance(p)[0] for p in [
        (-110.699924, 19.595918, 2),
        (-102.699924, 19.595918, 2),
    ]]
    fillet(f15_edges, radius=F15_R)

    # F16
    f16_edges = [f9_1.edges().sort_by_distance(p)[0] for p in [
        (-96.699924, -17.320508, 2),
        (-116.699924, -17.320508, 2),
    ]]
    fillet(f16_edges, radius=F16_R)

    # F17 (radius 2 in the source; OpenCascade refuses exactly that, so slightly less here)
    f17_edges = [f9_1.edges().sort_by_distance(p)[0] for p in [
        (-116.699924, -56.09614, 4),
        (-116.699924, -56.09614, 0),
    ]]
    fillet(f17_edges, radius=F17_R)

    # F18 (on face) → F19 (cut)
    with BuildSketch(Plane.XY.offset(4)):
        Polygon((-109.1999239548, -28.0961402953), (-109.1999239548, -31.0961402953), (-109.1999239548, -34.0961402953), (-112.6999239548, -34.0961402953), (-106.6999239548, -40.0961402953), (-100.6999239548, -34.0961402953), (-104.1999239548, -34.0961402953), (-104.1999239548, -31.0961402953), (-104.1999239548, -28.0961402953), (-100.6999239548, -28.0961402953), (-106.6999239548, -22.0961402953), (-112.6999239548, -28.0961402953), align=None)
    extrude(amount=-F19_DEPTH, mode=Mode.SUBTRACT)

    # F20
    f20_edges = [f9_1.edges().sort_by_distance(p)[0] for p in [
        (-112.699924, -28.09614, 3),
        (-100.699924, -28.09614, 3),
        (-100.699924, -34.09614, 3),
        (-112.699924, -34.09614, 3),
        (-109.199924, -34.09614, 3),
        (-109.199924, -28.09614, 3),
        (-104.199924, -28.09614, 3),
        (-104.199924, -34.09614, 3),
        (-106.699924, -22.09614, 3),
        (-106.699924, -40.09614, 3),
    ]]
    fillet(f20_edges, radius=F20_R)


solid = Compound([f2_10.part, f9_1.part])
